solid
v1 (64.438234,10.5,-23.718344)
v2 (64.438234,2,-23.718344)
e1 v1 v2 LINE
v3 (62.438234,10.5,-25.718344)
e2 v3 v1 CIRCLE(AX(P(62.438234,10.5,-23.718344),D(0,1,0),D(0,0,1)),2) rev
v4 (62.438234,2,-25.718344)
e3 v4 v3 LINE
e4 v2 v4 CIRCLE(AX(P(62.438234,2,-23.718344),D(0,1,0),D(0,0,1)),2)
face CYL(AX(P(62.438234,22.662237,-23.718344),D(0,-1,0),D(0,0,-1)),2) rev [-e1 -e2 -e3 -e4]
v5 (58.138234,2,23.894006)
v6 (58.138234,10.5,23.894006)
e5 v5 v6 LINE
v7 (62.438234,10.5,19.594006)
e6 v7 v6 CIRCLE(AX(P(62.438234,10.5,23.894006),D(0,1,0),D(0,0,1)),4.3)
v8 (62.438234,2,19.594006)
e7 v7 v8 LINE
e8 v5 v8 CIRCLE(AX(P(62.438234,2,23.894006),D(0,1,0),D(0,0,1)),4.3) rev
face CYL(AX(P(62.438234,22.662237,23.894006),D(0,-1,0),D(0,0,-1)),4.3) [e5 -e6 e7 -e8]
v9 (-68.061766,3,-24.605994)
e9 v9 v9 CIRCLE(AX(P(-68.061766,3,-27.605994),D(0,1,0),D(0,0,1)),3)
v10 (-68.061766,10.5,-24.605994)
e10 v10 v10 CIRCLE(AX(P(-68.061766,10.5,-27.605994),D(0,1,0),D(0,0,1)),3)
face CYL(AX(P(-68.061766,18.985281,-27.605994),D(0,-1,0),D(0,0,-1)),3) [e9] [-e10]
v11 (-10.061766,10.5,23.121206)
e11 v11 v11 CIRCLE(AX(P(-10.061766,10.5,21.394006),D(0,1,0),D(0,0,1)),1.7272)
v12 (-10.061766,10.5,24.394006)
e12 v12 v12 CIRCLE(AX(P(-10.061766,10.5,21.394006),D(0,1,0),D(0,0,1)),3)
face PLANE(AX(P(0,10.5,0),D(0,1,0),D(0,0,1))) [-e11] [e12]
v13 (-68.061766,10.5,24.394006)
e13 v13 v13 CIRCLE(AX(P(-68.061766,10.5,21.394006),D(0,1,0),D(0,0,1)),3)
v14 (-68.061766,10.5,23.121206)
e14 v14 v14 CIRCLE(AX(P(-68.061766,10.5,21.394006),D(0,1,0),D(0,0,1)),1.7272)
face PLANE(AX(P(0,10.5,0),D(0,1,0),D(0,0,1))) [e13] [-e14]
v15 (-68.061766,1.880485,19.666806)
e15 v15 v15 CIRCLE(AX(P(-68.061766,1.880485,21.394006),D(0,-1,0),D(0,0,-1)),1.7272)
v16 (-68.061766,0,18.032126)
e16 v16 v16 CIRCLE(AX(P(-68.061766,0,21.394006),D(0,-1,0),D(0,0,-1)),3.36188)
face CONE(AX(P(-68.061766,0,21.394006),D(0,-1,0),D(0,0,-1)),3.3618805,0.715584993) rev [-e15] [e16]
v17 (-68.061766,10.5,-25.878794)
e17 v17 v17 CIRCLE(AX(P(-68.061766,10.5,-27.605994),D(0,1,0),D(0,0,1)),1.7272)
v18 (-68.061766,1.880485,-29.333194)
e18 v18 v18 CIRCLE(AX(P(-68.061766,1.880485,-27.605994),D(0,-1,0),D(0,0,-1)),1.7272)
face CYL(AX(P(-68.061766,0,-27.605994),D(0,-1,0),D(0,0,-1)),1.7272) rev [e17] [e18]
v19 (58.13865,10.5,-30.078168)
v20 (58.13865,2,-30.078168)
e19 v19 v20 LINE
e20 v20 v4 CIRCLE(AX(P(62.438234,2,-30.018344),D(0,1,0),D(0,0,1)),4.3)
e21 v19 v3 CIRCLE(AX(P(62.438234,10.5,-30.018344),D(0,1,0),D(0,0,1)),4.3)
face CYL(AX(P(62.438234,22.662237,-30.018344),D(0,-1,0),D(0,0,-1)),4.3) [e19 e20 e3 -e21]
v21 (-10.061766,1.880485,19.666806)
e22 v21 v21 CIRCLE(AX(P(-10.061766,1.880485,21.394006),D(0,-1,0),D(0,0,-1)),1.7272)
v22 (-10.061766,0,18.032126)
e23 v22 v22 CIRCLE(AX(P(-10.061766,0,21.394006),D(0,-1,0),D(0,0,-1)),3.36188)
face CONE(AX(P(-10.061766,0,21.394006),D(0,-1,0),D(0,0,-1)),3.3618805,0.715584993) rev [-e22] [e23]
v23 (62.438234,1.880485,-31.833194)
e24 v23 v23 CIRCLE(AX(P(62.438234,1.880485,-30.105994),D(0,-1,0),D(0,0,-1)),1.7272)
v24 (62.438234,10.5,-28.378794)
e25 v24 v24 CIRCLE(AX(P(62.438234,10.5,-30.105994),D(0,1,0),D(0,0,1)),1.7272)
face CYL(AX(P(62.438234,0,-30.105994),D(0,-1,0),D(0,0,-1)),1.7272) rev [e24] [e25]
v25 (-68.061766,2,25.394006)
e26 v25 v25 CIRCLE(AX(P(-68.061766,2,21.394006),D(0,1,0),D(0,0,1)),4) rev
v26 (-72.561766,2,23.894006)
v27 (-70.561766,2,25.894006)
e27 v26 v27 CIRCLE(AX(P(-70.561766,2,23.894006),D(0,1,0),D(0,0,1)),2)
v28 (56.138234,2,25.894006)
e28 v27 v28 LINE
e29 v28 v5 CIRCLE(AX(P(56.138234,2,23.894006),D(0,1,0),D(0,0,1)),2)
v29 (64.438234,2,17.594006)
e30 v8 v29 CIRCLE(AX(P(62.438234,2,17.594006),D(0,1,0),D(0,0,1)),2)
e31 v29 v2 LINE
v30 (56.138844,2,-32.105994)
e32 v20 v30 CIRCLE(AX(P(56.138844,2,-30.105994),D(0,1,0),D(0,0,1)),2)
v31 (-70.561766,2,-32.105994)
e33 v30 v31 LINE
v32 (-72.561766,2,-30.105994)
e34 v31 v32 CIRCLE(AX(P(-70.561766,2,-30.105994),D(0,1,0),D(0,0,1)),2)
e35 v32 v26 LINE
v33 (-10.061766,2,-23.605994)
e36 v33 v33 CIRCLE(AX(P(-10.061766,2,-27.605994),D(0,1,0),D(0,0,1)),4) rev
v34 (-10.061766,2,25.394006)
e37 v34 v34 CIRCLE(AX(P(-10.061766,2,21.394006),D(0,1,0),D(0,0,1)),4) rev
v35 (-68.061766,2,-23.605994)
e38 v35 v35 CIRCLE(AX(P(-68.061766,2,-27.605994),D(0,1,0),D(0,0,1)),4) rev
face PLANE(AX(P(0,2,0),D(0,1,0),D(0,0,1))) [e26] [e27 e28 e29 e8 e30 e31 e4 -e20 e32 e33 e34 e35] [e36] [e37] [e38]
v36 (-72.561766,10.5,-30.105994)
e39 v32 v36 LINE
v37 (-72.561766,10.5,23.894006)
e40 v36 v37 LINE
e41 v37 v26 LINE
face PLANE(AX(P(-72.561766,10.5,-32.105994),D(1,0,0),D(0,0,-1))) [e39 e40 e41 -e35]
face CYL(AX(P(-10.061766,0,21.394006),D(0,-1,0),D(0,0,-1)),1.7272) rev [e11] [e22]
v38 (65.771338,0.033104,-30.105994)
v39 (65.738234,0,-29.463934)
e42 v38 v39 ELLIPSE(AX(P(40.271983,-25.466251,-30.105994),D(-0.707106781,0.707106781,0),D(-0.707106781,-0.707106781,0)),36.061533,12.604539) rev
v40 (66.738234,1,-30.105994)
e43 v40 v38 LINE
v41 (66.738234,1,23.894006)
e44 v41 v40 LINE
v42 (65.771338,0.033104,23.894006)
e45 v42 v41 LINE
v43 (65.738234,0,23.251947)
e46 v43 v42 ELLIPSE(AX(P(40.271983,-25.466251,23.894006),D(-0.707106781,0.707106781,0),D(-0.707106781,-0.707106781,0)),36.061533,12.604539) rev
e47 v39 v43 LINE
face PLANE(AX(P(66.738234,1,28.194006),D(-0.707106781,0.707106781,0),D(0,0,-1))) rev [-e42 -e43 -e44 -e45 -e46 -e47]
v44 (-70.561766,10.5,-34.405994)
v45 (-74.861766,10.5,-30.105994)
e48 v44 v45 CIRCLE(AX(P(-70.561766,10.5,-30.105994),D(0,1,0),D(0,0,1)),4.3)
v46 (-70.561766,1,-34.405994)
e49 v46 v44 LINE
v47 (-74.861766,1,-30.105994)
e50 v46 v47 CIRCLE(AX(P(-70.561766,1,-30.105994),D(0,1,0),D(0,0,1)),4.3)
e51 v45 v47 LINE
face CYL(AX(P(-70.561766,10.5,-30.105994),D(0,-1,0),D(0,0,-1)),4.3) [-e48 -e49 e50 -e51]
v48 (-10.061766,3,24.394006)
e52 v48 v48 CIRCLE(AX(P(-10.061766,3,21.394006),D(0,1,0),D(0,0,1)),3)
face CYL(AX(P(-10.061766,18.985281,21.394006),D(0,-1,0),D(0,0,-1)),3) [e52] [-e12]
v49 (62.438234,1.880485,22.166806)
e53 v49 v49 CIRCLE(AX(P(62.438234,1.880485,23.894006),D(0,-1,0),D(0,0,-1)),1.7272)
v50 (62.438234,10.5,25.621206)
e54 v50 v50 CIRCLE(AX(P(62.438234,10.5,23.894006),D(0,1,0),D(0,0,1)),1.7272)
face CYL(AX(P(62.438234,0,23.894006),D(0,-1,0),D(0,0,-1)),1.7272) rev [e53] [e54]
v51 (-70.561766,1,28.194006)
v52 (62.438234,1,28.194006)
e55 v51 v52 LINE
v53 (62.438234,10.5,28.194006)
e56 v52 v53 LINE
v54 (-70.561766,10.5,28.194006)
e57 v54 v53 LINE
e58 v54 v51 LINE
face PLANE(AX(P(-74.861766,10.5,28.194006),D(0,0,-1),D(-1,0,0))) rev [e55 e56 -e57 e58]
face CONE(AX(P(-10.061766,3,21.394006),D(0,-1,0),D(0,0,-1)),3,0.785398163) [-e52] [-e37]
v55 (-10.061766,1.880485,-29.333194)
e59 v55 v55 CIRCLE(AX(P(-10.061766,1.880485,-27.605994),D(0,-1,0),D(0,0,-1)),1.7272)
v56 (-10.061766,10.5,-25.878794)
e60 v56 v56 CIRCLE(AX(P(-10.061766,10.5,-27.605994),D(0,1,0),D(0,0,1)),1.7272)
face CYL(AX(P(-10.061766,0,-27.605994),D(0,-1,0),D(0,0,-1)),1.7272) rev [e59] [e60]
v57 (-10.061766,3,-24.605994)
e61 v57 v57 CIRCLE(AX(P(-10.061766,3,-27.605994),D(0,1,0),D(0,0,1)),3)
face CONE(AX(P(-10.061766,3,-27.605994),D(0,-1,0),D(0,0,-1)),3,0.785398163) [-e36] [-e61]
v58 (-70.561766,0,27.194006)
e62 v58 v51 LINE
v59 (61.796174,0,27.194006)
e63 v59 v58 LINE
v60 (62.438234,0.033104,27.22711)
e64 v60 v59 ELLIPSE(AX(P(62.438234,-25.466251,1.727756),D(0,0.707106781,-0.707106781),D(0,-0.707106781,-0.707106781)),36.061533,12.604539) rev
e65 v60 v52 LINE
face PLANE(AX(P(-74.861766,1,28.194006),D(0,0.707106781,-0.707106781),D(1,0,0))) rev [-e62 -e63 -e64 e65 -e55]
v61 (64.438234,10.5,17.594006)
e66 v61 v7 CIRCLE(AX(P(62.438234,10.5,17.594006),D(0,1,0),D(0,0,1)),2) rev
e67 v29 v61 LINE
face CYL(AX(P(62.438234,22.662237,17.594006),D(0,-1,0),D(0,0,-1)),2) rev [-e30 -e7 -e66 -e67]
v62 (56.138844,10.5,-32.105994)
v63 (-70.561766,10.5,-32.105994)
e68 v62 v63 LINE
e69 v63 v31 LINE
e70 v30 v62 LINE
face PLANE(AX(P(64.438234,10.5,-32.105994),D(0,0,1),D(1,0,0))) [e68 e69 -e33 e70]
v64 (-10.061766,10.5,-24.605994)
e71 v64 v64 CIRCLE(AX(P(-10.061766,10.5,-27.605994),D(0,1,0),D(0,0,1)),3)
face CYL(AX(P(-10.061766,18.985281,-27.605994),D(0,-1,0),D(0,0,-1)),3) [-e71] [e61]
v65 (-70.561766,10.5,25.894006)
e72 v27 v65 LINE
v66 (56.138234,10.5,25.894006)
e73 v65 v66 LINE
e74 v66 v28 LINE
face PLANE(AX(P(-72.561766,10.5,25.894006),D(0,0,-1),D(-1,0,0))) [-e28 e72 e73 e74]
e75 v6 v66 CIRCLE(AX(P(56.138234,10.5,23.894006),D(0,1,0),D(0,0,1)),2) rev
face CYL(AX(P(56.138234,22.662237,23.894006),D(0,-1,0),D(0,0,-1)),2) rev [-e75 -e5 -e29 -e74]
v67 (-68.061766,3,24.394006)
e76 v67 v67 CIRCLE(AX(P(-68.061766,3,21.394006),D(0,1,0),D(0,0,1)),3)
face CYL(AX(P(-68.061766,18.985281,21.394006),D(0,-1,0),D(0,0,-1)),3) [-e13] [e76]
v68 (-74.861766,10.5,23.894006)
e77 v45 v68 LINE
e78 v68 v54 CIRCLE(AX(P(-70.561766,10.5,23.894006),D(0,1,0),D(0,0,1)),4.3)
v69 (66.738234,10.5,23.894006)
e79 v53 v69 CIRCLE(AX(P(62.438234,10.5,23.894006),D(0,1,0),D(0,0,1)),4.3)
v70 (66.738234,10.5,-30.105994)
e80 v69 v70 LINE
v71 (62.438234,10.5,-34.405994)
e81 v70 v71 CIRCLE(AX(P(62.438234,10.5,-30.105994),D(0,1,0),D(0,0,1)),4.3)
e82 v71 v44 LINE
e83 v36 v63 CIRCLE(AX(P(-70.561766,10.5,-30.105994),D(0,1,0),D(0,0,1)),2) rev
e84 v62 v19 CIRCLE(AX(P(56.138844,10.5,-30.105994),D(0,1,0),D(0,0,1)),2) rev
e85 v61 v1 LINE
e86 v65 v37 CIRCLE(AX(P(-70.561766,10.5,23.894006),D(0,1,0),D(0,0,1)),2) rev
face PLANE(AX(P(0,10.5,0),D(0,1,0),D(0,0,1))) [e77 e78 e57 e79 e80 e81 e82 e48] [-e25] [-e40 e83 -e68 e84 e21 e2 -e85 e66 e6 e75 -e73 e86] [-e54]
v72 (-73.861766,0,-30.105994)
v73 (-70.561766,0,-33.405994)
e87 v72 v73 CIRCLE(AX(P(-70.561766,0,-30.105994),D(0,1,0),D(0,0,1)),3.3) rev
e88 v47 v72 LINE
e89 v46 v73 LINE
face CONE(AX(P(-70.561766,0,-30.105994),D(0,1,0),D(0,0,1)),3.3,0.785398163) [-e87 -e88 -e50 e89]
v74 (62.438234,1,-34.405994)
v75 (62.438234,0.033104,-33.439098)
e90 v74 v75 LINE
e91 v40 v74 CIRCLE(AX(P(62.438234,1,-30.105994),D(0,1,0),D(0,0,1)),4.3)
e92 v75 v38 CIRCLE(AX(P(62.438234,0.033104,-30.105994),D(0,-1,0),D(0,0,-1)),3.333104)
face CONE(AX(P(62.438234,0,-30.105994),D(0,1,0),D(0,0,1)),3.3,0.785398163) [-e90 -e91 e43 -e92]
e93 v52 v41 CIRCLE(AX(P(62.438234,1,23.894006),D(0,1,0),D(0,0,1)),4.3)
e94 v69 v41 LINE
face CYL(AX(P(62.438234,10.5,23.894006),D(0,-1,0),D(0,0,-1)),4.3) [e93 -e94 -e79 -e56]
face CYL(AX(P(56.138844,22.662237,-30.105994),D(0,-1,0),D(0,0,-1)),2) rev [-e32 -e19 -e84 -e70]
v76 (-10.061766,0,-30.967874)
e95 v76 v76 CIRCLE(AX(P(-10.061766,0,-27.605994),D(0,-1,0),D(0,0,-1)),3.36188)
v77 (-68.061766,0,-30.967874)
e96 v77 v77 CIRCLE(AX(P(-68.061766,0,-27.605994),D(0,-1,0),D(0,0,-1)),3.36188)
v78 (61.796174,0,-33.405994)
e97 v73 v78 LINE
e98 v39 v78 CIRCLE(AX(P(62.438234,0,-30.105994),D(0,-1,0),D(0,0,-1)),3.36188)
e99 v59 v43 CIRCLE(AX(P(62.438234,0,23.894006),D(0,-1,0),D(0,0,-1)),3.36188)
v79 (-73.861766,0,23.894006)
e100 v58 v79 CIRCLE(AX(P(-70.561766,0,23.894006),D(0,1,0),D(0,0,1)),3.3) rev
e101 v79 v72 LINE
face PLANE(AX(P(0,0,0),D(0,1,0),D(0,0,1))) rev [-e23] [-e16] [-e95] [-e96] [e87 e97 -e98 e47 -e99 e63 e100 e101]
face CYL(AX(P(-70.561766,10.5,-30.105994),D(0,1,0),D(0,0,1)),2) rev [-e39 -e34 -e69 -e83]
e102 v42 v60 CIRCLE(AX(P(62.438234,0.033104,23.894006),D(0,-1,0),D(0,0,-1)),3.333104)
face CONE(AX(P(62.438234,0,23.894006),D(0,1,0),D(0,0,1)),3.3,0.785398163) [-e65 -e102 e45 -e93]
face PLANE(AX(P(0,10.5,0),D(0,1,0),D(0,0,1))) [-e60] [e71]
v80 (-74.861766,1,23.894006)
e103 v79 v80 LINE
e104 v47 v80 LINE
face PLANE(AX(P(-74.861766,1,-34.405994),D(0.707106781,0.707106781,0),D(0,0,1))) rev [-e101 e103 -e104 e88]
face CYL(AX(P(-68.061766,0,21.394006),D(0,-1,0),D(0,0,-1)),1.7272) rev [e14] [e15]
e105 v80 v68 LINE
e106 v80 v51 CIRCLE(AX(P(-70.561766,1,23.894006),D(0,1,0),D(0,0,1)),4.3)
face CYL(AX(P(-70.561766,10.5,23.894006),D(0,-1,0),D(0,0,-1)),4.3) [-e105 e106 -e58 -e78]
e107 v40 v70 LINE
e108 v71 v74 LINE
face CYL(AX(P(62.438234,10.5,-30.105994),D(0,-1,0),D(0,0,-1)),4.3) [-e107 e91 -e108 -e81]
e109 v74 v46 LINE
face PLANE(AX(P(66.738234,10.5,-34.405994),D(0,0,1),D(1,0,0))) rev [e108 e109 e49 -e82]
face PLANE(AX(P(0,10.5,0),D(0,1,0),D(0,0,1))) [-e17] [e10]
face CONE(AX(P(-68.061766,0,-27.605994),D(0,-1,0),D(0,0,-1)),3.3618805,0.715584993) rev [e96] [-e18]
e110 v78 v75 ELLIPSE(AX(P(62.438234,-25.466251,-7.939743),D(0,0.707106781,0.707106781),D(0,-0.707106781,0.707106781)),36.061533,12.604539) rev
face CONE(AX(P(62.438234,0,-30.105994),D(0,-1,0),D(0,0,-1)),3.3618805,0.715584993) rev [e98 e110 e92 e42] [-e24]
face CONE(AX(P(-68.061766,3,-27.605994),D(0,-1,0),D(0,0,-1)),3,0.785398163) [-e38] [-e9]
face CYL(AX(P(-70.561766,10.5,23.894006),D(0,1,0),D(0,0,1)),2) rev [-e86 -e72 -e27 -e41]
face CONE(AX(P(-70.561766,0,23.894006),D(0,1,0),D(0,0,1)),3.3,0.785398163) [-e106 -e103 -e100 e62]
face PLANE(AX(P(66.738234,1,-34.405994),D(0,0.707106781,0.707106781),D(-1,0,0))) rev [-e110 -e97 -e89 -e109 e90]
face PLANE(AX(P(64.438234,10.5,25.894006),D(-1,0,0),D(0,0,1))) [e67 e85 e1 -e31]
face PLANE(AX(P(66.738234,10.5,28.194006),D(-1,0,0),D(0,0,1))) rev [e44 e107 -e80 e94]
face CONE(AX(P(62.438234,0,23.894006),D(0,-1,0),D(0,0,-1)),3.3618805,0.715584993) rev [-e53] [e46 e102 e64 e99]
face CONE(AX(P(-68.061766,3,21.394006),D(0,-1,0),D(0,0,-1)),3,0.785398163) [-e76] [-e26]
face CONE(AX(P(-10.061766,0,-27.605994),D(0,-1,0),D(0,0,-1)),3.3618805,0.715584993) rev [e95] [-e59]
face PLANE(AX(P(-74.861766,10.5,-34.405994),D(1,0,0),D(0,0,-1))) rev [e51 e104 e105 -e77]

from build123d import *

# Parameters (mm, degrees)
SKETCH3_W                                         = 141.6
SKETCH3_H                                         = 62.6
SKETCH3_W_2                                       = 137
SKETCH3_H_2                                       = 58
BOSS_EXTRUDE1_DEPTH                               = 10.5
SKETCH5_W                                         = 137
SKETCH5_H                                         = 58
BOSS_EXTRUDE2_DEPTH                               = 2
SKETCH6_R                                         = 3
BOSS_EXTRUDE3_DEPTH                               = 8.5
FILLET6_R                                         = 2
FILLET8_R                                         = 2
CHAMFER1_SIZE                                     = 1
SKETCH24_R                                        = 4.3
BOSS_EXTRUDE7_DEPTH                               = 8.5
FILLET21_R                                        = 2
FILLET22_R                                        = 2
FILLET20_R                                        = 4.3
CSK_FOR_4_FLAT_HEAD_SOCKET_CAP_SCREW1_D           = 3.4544
CSK_FOR_4_FLAT_HEAD_SOCKET_CAP_SCREW1_DEPTH       = 14
CSK_FOR_4_FLAT_HEAD_SOCKET_CAP_SCREW1_CSINK_D     = 6.723761
CSK_FOR_4_FLAT_HEAD_SOCKET_CAP_SCREW1_CSINK_ANGLE = 82
CSK_FOR_4_FLAT_HEAD_SOCKET_CAP_SCREW1_TIP         = 1.037806461
CHAMFER7_SIZE                                     = 1


# Some blends are built 0.0001 mm under size
with BuildPart() as part:
    # Sketch3 → Boss-Extrude1 (new body)
    with BuildSketch(Plane(origin=(0, 0, 0), x_dir=(1, 0, 0), z_dir=(0, 1, 0))):
        with Locations((-4.061766162, 3.105993834)):
            Rectangle(SKETCH3_W, SKETCH3_H)
        with Locations((-4.061766162, 3.105993834)):
            Rectangle(SKETCH3_W_2, SKETCH3_H_2, mode=Mode.SUBTRACT)
    extrude(amount=BOSS_EXTRUDE1_DEPTH)

    # Sketch5 → Boss-Extrude2 (add)
    with BuildSketch(Plane(origin=(0, 0, 0), x_dir=(1, 0, 0), z_dir=(0, 1, 0))):
        with Locations((-4.061766162, 3.105993834)):
            Rectangle(SKETCH5_W, SKETCH5_H)
    extrude(amount=BOSS_EXTRUDE2_DEPTH)

    # Sketch6 → Boss-Extrude3 (add)
    with BuildSketch(Plane(origin=(0, 2, 0), x_dir=(1, 0, 0), z_dir=(0, 1, 0))):
        with Locations(Location((-68.061766162, 27.605993834, 0), (0, 0, 270))):
            Circle(SKETCH6_R)
        with Locations(Location((-68.061766162, -21.394006166, 0), (0, 0, 270))):
            Circle(SKETCH6_R)
        with Locations(Location((-10.061766162, -21.394006166, 0), (0, 0, 270))):
            Circle(SKETCH6_R)
        with Locations(Location((-10.061766162, 27.605993834, 0), (0, 0, 270))):
            Circle(SKETCH6_R)
    extrude(amount=BOSS_EXTRUDE3_DEPTH)

    # Fillet6
    fillet6_edges = [part.edges().sort_by_distance(p)[0] for p in [
        (64.438233838, 6.25, -32.105993834),
    ]]
    fillet(fillet6_edges, radius=FILLET6_R)

    # Fillet8
    fillet8_edges = [part.edges().sort_by_distance(p)[0] for p in [
        (-72.561766162, 6.25, -32.105993834),
        (-72.561766162, 6.25, 25.894006166),
    ]]
    fillet(fillet8_edges, radius=FILLET8_R)

    # Chamfer1
    chamfer1_edges = [part.edges().sort_by_distance(p)[0] for p in [
        (-68.061766162, 2, -30.605993834),
        (-68.061766162, 2, 18.394006166),
        (-10.061766162, 2, 18.394006166),
        (-10.061766162, 2, -30.605993834),
    ]]
    chamfer(chamfer1_edges, length=CHAMFER1_SIZE)

    # Sketch24 → Boss-Extrude7 (add)
    with BuildSketch(Plane(origin=(0, 2, 0), x_dir=(1, 0, 0), z_dir=(0, 1, 0))):
        with Locations((62.438233838, -23.894006166)):
            Circle(SKETCH24_R)
        with Locations((62.438233838, 30.01834388)):
            Circle(SKETCH24_R)
    extrude(amount=BOSS_EXTRUDE7_DEPTH)

    # Fillet21
    fillet21_edges = [part.edges().sort_by_distance(p)[0] for p in [
        (58.631660576, 6.25, 25.894006166),
    ]]
    fillet(fillet21_edges, radius=FILLET21_R)

    # Fillet22
    fillet22_edges = [part.edges().sort_by_distance(p)[0] for p in [
        (64.438233838, 6.25, -26.211770618),
        (58.679016144, 6.25, -32.105993834),
        (64.438233838, 6.25, 20.087432904),
    ]]
    fillet(fillet22_edges, radius=FILLET22_R)

    # Fillet20
    fillet20_edges = [part.edges().sort_by_distance(p)[0] for p in [
        (-74.861766162, 5.25, -34.405993834),
        (66.738233838, 5.25, -34.405993834),
        (66.738233838, 5.25, 28.194006166),
        (-74.861766162, 5.25, 28.194006166),
    ]]
    fillet(fillet20_edges, radius=FILLET20_R - 0.0001)  # a hair under: the kernel refuses the full size

    # CSK for #4 Flat Head Socket Cap Screw1
    with Locations(Plane(origin=(0, 0, 0), x_dir=(-1, 0, 0), z_dir=(0, -1, 0))):
        with Locations((68.061766162, 27.605993834), (68.061766162, -21.394006166), (-62.438233838, 30.105993834), (-62.438233838, -23.894006166), (10.061766162, -21.394006166), (10.061766162, 27.605993834)):
            CounterSinkHole(CSK_FOR_4_FLAT_HEAD_SOCKET_CAP_SCREW1_D / 2, CSK_FOR_4_FLAT_HEAD_SOCKET_CAP_SCREW1_CSINK_D / 2, depth=CSK_FOR_4_FLAT_HEAD_SOCKET_CAP_SCREW1_DEPTH, counter_sink_angle=CSK_FOR_4_FLAT_HEAD_SOCKET_CAP_SCREW1_CSINK_ANGLE)
            with Locations((0, 0, -(CSK_FOR_4_FLAT_HEAD_SOCKET_CAP_SCREW1_DEPTH + CSK_FOR_4_FLAT_HEAD_SOCKET_CAP_SCREW1_TIP / 2))):  # 118° drill point
                Cone(0, CSK_FOR_4_FLAT_HEAD_SOCKET_CAP_SCREW1_D / 2, CSK_FOR_4_FLAT_HEAD_SOCKET_CAP_SCREW1_TIP, mode=Mode.SUBTRACT)

    # Chamfer7
    # the kernel refuses this chamfer: 1 mm, written as the material it takes off along each edge
    with BuildSketch(Plane(origin=(62.438333838, 0, -34.405993834), x_dir=(0, -0.027495876610586292, 0.9996219169112968), z_dir=(-1, 0, 0)), Plane(origin=(-70.561866162, 0, 28.194006166), x_dir=(0, -0.02749587661058639, -0.9996219169112968), z_dir=(1, 0, 0))) as chamfer7_piece_1:
        Polygon((CHAMFER7_SIZE * 0.999621916911, CHAMFER7_SIZE * 0.0274958766106), (-CHAMFER7_SIZE * 0.0274958766106, CHAMFER7_SIZE * 0.999621916911), (0, 0), align=None)
    extrude(amount=133.0002, mode=Mode.SUBTRACT)
    with BuildSketch(Plane(origin=(-74.861766162, 0, -30.106093834), x_dir=(0.9996219169112968, -0.027495876610586483, 0), z_dir=(0, 0, 1)), Plane(origin=(66.738233838, 0, 23.894106166), x_dir=(-0.9996219169112968, -0.027495876610586483, 0), z_dir=(0, 0, -1))) as chamfer7_piece_2:
        Polygon((CHAMFER7_SIZE * 0.999621916911, CHAMFER7_SIZE * 0.0274958766106), (-CHAMFER7_SIZE * 0.0274958766106, CHAMFER7_SIZE * 0.999621916911), (0, 0), align=None)
    extrude(amount=54.0002, mode=Mode.SUBTRACT)
    with BuildSketch(Plane(origin=(62.438333838, 0, 23.894106166), x_dir=(0, 0, 1), z_dir=(-1, 0, 0))) as chamfer7_piece_3:
        Polygon((4.2999 - CHAMFER7_SIZE, 0), (4.2999, CHAMFER7_SIZE), (4.2999, 0), align=None)
    revolve(axis=Axis((62.438333838, 0, 23.894106166), (0, 1, 0)), revolution_arc=90, mode=Mode.SUBTRACT)
    with BuildSketch(Plane(origin=(-70.561866162, 0, 23.894106166), x_dir=(0, 0, 1), z_dir=(1, 0, 0))) as chamfer7_piece_4:
        Polygon((4.2999 - CHAMFER7_SIZE, 0), (4.2999, -CHAMFER7_SIZE), (4.2999, 0), align=None)
    revolve(axis=Axis((-70.561866162, 0, 23.894106166), (0, -1, 0)), revolution_arc=90, mode=Mode.SUBTRACT)
    with BuildSketch(Plane(origin=(-70.561866162, 0, -30.106093834), x_dir=(0, 0, -1), z_dir=(1, 0, 0))) as chamfer7_piece_5:
        Polygon((4.2999 - CHAMFER7_SIZE, 0), (4.2999, CHAMFER7_SIZE), (4.2999, 0), align=None)
    revolve(axis=Axis((-70.561866162, 0, -30.106093834), (0, 1, 0)), revolution_arc=90, mode=Mode.SUBTRACT)
    with BuildSketch(Plane(origin=(62.438333838, 0, -30.106093834), x_dir=(1, 0, 0), z_dir=(0, 0, 1))) as chamfer7_piece_6:
        Polygon((4.2999 - CHAMFER7_SIZE, 0), (4.2999, CHAMFER7_SIZE), (4.2999, 0), align=None)
    revolve(axis=Axis((62.438333838, 0, -30.106093834), (0, 1, 0)), revolution_arc=90, mode=Mode.SUBTRACT)


solid = part.part
